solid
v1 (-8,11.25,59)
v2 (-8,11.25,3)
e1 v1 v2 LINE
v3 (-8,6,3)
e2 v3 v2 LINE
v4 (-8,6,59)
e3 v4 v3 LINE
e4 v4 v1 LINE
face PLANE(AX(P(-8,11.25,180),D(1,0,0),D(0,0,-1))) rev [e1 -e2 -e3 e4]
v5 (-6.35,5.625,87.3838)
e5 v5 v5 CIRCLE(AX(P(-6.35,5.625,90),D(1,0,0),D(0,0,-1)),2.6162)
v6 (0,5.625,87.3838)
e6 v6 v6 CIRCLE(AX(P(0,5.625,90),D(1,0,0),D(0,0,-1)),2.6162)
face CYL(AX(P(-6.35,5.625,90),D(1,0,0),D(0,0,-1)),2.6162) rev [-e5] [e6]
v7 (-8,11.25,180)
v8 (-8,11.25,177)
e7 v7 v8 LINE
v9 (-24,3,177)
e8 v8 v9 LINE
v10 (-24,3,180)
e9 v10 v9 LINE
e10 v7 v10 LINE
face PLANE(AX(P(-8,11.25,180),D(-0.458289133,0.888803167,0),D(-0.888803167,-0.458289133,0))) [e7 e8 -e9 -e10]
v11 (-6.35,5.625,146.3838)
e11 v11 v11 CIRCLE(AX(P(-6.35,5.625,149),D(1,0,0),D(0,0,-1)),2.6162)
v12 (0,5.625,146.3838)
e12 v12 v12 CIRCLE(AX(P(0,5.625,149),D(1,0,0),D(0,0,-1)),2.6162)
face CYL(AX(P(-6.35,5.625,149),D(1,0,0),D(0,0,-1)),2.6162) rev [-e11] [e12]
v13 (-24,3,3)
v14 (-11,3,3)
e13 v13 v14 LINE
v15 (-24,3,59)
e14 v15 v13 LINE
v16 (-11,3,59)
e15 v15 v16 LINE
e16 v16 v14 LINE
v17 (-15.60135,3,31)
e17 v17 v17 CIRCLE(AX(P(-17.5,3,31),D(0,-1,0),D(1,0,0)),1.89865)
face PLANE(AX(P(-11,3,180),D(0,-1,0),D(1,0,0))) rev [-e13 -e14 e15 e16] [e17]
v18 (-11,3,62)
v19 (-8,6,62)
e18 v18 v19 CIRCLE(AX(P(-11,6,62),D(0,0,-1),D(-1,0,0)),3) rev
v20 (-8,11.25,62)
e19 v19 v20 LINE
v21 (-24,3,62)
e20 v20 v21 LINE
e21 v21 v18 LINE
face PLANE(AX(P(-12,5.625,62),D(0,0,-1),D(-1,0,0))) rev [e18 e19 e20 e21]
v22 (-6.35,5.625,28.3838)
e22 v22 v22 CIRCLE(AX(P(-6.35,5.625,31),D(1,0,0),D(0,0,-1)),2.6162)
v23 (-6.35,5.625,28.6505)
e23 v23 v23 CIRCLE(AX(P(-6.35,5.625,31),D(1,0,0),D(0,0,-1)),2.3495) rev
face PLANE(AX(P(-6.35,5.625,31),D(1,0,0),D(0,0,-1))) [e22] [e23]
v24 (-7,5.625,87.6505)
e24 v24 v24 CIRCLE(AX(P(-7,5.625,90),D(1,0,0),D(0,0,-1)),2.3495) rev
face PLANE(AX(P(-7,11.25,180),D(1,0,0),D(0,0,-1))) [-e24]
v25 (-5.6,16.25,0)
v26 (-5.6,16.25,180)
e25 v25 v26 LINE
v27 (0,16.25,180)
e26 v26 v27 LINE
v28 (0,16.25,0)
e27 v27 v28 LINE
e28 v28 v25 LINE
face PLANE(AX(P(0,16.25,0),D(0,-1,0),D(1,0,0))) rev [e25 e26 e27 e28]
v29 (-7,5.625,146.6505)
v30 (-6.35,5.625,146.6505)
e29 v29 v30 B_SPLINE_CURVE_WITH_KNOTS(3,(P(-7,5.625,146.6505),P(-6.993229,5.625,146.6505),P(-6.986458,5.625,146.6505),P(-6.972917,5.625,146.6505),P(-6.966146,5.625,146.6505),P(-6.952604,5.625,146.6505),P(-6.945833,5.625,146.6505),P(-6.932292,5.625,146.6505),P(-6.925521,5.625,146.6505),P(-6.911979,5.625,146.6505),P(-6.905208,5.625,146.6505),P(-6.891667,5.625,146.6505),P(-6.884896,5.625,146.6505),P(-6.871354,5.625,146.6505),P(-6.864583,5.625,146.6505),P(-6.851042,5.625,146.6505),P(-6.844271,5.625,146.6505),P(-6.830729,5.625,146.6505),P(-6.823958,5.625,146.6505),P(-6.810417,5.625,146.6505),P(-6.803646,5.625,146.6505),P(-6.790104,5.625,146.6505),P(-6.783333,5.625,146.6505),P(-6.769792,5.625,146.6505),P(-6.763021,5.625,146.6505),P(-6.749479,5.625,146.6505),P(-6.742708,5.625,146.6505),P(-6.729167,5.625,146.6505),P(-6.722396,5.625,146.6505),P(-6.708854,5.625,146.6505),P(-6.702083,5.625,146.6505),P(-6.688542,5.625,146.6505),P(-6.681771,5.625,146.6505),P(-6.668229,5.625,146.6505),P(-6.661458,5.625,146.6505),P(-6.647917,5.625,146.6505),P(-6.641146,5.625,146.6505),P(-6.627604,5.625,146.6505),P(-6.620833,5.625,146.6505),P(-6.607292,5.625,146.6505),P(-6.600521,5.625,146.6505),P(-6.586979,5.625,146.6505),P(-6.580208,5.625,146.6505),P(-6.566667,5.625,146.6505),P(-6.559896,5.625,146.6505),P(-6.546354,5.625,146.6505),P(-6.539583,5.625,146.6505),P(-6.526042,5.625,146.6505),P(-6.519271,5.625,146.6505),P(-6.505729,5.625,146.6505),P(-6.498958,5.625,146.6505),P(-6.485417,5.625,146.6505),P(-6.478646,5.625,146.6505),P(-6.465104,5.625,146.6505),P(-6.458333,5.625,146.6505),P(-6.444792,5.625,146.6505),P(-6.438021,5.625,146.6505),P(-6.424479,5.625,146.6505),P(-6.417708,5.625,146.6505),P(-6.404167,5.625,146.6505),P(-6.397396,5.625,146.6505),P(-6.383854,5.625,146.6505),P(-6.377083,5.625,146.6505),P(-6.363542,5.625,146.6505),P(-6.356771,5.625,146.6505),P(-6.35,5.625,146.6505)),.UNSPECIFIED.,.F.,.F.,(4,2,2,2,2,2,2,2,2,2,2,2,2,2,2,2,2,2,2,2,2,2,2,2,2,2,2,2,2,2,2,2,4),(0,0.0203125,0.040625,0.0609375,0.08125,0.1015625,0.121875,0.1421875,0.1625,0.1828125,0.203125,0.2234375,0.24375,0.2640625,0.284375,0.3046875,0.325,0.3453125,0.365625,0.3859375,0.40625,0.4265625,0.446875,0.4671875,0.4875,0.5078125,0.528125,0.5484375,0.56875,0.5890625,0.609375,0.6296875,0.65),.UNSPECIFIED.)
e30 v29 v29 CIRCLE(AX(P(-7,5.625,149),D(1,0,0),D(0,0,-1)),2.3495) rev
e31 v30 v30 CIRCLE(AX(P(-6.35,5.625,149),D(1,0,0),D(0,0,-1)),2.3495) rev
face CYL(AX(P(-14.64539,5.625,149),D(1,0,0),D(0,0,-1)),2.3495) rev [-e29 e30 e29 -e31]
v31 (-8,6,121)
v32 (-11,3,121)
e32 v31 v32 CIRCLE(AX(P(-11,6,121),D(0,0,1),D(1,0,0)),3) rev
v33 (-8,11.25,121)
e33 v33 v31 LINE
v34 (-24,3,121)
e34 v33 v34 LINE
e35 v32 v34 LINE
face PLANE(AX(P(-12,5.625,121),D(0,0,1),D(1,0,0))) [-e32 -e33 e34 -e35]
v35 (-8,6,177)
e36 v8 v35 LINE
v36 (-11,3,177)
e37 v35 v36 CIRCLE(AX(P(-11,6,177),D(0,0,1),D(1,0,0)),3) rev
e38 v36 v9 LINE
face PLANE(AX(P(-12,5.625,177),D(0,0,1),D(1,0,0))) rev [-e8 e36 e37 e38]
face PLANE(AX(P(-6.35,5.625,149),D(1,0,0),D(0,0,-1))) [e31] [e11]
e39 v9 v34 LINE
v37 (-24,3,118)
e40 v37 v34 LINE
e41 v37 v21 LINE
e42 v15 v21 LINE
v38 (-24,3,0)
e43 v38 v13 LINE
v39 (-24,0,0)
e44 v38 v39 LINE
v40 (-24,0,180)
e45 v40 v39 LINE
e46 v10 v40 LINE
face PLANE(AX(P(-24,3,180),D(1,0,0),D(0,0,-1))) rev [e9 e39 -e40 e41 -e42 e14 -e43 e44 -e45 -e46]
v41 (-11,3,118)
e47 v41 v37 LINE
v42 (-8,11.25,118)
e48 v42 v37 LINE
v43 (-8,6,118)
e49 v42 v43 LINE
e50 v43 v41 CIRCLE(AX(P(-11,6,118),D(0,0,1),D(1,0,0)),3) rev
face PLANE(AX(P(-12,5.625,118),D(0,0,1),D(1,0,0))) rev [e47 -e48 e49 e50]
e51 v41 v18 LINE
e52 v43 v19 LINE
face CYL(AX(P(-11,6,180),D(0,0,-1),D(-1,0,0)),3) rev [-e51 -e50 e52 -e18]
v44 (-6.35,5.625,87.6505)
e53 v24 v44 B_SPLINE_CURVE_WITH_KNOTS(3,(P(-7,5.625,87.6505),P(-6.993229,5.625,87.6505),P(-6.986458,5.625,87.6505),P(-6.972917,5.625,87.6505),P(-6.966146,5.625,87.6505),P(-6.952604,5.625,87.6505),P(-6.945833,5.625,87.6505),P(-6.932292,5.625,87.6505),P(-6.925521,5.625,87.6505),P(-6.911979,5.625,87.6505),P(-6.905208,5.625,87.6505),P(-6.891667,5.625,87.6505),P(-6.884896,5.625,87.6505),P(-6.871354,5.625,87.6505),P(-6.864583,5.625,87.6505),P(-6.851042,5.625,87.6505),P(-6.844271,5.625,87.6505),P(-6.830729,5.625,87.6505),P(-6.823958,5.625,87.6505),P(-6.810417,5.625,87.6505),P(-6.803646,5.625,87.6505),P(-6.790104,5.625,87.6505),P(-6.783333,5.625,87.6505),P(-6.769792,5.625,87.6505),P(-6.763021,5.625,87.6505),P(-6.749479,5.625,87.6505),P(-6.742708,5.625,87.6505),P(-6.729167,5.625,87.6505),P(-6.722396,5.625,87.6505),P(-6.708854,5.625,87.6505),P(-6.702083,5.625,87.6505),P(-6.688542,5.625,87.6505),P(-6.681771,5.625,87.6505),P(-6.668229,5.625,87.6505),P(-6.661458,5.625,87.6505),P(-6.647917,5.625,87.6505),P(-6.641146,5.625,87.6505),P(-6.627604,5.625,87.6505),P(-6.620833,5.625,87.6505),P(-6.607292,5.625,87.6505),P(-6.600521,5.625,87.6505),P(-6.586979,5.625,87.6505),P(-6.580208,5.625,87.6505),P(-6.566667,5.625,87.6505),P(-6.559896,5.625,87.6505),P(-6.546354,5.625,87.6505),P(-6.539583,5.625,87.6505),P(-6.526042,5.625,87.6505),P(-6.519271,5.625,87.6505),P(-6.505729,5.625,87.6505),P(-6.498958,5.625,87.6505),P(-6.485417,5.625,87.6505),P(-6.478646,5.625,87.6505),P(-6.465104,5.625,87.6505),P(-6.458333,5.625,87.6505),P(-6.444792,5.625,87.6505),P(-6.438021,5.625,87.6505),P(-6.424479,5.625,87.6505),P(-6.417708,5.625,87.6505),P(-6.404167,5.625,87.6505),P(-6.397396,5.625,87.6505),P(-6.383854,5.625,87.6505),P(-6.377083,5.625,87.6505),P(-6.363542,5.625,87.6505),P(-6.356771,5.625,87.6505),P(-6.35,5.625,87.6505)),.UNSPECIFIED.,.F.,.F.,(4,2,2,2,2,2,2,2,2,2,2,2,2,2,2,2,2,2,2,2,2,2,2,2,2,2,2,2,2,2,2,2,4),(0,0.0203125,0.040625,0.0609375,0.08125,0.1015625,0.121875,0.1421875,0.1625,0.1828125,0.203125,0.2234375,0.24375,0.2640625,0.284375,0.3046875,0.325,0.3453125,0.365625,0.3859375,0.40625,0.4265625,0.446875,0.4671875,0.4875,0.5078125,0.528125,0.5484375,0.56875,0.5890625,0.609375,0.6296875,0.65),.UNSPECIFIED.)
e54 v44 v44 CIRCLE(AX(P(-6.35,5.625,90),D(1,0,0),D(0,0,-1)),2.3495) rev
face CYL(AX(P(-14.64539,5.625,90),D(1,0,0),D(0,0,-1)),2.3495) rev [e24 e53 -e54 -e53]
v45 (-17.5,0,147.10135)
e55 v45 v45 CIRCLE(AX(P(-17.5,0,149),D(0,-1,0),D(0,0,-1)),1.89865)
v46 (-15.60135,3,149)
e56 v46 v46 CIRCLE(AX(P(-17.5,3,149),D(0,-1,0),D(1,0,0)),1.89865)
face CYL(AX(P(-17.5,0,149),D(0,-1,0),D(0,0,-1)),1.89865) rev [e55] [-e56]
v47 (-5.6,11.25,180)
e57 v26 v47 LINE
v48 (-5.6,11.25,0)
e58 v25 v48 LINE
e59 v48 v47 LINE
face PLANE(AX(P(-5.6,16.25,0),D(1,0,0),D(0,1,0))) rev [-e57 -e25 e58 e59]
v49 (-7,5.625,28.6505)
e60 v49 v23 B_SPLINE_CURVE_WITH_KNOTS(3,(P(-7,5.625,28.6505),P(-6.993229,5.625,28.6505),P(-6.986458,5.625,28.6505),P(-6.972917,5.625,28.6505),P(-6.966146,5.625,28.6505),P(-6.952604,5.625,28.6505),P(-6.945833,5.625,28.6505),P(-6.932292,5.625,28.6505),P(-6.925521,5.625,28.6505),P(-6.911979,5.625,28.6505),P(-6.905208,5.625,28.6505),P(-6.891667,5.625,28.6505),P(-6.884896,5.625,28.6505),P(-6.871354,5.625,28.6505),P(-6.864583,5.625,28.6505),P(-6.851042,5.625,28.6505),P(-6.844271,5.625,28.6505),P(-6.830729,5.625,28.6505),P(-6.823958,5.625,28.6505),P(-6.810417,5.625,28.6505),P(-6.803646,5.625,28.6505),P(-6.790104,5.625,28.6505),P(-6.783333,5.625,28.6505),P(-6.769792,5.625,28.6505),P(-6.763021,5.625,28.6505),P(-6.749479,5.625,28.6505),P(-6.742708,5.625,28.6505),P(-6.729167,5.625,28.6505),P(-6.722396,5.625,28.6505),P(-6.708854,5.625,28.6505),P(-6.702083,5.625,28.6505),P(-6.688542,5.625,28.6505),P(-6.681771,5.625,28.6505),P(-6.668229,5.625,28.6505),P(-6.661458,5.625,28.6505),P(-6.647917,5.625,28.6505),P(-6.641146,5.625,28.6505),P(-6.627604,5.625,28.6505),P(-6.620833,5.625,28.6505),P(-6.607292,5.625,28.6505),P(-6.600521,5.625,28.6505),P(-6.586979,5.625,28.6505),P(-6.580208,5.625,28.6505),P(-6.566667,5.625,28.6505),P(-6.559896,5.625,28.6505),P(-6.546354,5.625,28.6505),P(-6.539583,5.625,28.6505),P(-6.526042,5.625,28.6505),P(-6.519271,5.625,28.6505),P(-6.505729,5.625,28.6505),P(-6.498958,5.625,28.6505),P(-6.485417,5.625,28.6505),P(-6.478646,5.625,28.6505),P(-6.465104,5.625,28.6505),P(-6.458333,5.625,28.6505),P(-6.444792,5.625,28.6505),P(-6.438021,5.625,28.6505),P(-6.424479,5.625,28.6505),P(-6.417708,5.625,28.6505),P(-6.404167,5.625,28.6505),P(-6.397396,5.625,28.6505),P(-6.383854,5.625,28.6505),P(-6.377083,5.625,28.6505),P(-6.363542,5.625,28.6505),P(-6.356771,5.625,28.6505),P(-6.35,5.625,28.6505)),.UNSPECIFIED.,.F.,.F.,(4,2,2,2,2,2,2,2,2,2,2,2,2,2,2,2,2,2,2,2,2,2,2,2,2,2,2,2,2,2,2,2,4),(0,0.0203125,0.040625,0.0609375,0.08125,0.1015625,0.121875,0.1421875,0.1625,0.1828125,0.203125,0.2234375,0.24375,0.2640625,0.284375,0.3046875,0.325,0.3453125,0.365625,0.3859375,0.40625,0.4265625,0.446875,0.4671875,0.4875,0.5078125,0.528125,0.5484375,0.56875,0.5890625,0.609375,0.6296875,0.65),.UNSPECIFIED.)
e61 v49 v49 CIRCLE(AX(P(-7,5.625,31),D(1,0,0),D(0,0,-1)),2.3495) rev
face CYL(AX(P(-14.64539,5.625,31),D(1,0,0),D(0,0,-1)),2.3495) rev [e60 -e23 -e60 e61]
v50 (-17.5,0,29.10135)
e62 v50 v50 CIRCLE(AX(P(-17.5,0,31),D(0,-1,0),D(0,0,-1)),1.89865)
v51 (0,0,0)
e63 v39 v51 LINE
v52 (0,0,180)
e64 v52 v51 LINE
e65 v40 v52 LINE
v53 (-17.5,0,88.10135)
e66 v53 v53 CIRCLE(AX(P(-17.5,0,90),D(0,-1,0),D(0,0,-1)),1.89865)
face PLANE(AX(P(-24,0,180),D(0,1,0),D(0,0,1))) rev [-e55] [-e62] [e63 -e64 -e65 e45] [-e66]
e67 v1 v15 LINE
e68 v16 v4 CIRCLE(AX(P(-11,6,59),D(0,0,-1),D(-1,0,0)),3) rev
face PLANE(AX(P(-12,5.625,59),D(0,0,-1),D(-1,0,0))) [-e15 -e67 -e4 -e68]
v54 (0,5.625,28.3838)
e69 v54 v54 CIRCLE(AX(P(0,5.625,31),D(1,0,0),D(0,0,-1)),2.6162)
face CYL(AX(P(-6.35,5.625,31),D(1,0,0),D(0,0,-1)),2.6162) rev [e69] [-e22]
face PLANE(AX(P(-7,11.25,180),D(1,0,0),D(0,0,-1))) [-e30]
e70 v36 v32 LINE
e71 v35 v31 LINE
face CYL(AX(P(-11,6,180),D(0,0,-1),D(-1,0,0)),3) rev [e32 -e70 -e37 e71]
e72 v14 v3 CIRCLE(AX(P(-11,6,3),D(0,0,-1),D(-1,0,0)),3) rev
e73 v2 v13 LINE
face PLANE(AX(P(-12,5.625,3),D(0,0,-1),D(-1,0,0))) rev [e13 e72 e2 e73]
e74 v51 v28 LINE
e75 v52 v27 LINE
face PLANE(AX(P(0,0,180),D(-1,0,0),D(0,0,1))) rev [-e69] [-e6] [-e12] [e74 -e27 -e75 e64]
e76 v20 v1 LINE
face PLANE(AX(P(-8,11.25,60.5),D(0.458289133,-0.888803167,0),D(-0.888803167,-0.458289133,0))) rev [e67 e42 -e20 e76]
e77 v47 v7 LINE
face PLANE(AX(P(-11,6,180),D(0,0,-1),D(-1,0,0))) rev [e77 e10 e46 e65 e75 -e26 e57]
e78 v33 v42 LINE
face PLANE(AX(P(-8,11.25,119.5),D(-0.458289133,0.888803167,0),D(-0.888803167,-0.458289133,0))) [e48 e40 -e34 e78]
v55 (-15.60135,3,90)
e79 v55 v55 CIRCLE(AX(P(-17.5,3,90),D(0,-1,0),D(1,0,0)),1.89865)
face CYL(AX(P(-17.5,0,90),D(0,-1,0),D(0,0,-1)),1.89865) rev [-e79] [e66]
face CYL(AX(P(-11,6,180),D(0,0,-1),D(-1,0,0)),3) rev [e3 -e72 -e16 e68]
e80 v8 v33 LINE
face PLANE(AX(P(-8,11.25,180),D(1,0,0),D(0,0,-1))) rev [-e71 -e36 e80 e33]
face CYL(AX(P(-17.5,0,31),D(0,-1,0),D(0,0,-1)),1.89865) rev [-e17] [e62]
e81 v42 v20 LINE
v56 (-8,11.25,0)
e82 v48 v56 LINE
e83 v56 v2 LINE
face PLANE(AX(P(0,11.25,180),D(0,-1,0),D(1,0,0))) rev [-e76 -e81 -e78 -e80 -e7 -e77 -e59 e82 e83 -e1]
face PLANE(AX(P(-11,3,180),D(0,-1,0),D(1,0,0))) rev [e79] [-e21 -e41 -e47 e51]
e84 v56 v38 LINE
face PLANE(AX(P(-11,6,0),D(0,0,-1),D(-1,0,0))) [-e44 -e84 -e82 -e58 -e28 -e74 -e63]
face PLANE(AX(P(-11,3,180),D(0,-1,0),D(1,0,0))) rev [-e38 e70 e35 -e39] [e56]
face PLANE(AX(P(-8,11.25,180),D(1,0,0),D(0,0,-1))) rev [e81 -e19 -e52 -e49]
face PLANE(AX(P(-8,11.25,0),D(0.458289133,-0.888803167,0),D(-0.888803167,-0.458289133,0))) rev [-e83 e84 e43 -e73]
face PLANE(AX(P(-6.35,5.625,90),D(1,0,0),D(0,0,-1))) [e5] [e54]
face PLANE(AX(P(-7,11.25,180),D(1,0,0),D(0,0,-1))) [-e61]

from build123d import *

# Parameters (mm, degrees)
BOSS_EXTRUDE1_DEPTH   = 180
RIB3_REACH            = 124.404
SKETCH4_WALL_W        = 264.810334732
SKETCH4_WALL_H        = 3
RIB4_START            = -3
RIB4_DEPTH            = 3
F_6_CLEARANCE_HOLE1_D = 3.7973
SKETCH6_R             = 2.3495
CUT_EXTRUDE1_DEPTH    = 7
SKETCH12_R            = 2.6162
CUT_EXTRUDE2_DEPTH    = 6.35
SKETCH13_W            = 5.6
SKETCH13_H            = 180
BOSS_EXTRUDE2_DEPTH   = 5


# Read off the part's stored shape, not the designer's step: Rib4
with BuildPart() as part:
    # Sketch1 → Boss-Extrude1 (new body)
    with BuildSketch(Plane.XY):
        with BuildLine():
            Line((0, 0), (0, 11.25))
            Line((0, 11.25), (-8, 11.25))
            Line((-8, 11.25), (-8, 6))
            ThreePointArc((-8, 6), (-8.878679656, 3.878679656), (-11, 3))
            Line((-11, 3), (-24, 3))
            Line((-24, 3), (-24, 0))
            Line((-24, 0), (0, 0))
        make_face()
    extrude(amount=BOSS_EXTRUDE1_DEPTH)

    # Sketch4 wall → Rib3 (add, up to next)
    with BuildSketch(Plane(origin=(-16, 7.125, 60.5), x_dir=(-0.888803167408, -0.458289133195, 0), z_dir=(-0.458289133195, 0.888803167408, 0)), mode=Mode.PRIVATE) as rib3_sk1:
        Rectangle(SKETCH4_WALL_W, SKETCH4_WALL_H)
    rib3_tool1 = extrude(rib3_sk1.sketch, amount=-RIB3_REACH, mode=Mode.PRIVATE) - part.part
    rib3 = rib3_tool1.solids().sort_by_distance((-16, 7.125, 60.5))[0]
    add(rib3)

    # Rib4 outline → Rib4 (add)
    with BuildSketch(Plane(origin=(0, 0, 0), x_dir=(-1, 0, 0), z_dir=(0, 0, -1)).offset(RIB4_START)):
        with BuildLine():
            Line((24, 3), (8, 11.25))
            Line((8, 11.25), (8, 6))
            ThreePointArc((8, 6), (8.878679656, 3.878679656), (11, 3))
            Line((11, 3), (24, 3))
        make_face()
    rib4 = extrude(amount=RIB4_DEPTH)

    # Mirror1: Rib3, Rib4 across plane
    add(rib3.mirror(Plane(origin=(0, 0, 90), x_dir=(1, 0, 0), z_dir=(0, 0, -1))))
    add(rib4.mirror(Plane(origin=(0, 0, 90), x_dir=(1, 0, 0), z_dir=(0, 0, -1))))

    # #6 Clearance Hole1 (through all)
    with Locations(Plane(origin=(0, 0, 0), x_dir=(-1, 0, 0), z_dir=(0, -1, 0))):
        with Locations((17.5, -31), (17.5, -149), (17.5, -90)):
            Hole(F_6_CLEARANCE_HOLE1_D / 2)

    # Sketch6 → Cut-Extrude1 (cut)
    with BuildSketch(Plane(origin=(0, 0, 0), x_dir=(0, 0, -1), z_dir=(1, 0, 0))):
        with Locations((-149, 5.625)):
            Circle(SKETCH6_R)
        with Locations((-31, 5.625)):
            Circle(SKETCH6_R)
        with Locations((-90, 5.625)):
            Circle(SKETCH6_R)
    extrude(amount=-CUT_EXTRUDE1_DEPTH, mode=Mode.SUBTRACT)

    # Sketch12 → Cut-Extrude2 (cut)
    with BuildSketch(Plane(origin=(0, 0, 0), x_dir=(0, 0, -1), z_dir=(1, 0, 0))):
        with Locations((-149, 5.625)):
            Circle(SKETCH12_R)
        with Locations((-31, 5.625)):
            Circle(SKETCH12_R)
        with Locations((-90, 5.625)):
            Circle(SKETCH12_R)
    extrude(amount=-CUT_EXTRUDE2_DEPTH, mode=Mode.SUBTRACT)

    # Sketch13 → Boss-Extrude2 (add)
    with BuildSketch(Plane(origin=(0, 11.25, 0), x_dir=(1, 0, 0), z_dir=(0, 1, 0))):
        with Locations((-2.8, -90)):
            Rectangle(SKETCH13_W, SKETCH13_H)
    extrude(amount=BOSS_EXTRUDE2_DEPTH)


solid = part.part
